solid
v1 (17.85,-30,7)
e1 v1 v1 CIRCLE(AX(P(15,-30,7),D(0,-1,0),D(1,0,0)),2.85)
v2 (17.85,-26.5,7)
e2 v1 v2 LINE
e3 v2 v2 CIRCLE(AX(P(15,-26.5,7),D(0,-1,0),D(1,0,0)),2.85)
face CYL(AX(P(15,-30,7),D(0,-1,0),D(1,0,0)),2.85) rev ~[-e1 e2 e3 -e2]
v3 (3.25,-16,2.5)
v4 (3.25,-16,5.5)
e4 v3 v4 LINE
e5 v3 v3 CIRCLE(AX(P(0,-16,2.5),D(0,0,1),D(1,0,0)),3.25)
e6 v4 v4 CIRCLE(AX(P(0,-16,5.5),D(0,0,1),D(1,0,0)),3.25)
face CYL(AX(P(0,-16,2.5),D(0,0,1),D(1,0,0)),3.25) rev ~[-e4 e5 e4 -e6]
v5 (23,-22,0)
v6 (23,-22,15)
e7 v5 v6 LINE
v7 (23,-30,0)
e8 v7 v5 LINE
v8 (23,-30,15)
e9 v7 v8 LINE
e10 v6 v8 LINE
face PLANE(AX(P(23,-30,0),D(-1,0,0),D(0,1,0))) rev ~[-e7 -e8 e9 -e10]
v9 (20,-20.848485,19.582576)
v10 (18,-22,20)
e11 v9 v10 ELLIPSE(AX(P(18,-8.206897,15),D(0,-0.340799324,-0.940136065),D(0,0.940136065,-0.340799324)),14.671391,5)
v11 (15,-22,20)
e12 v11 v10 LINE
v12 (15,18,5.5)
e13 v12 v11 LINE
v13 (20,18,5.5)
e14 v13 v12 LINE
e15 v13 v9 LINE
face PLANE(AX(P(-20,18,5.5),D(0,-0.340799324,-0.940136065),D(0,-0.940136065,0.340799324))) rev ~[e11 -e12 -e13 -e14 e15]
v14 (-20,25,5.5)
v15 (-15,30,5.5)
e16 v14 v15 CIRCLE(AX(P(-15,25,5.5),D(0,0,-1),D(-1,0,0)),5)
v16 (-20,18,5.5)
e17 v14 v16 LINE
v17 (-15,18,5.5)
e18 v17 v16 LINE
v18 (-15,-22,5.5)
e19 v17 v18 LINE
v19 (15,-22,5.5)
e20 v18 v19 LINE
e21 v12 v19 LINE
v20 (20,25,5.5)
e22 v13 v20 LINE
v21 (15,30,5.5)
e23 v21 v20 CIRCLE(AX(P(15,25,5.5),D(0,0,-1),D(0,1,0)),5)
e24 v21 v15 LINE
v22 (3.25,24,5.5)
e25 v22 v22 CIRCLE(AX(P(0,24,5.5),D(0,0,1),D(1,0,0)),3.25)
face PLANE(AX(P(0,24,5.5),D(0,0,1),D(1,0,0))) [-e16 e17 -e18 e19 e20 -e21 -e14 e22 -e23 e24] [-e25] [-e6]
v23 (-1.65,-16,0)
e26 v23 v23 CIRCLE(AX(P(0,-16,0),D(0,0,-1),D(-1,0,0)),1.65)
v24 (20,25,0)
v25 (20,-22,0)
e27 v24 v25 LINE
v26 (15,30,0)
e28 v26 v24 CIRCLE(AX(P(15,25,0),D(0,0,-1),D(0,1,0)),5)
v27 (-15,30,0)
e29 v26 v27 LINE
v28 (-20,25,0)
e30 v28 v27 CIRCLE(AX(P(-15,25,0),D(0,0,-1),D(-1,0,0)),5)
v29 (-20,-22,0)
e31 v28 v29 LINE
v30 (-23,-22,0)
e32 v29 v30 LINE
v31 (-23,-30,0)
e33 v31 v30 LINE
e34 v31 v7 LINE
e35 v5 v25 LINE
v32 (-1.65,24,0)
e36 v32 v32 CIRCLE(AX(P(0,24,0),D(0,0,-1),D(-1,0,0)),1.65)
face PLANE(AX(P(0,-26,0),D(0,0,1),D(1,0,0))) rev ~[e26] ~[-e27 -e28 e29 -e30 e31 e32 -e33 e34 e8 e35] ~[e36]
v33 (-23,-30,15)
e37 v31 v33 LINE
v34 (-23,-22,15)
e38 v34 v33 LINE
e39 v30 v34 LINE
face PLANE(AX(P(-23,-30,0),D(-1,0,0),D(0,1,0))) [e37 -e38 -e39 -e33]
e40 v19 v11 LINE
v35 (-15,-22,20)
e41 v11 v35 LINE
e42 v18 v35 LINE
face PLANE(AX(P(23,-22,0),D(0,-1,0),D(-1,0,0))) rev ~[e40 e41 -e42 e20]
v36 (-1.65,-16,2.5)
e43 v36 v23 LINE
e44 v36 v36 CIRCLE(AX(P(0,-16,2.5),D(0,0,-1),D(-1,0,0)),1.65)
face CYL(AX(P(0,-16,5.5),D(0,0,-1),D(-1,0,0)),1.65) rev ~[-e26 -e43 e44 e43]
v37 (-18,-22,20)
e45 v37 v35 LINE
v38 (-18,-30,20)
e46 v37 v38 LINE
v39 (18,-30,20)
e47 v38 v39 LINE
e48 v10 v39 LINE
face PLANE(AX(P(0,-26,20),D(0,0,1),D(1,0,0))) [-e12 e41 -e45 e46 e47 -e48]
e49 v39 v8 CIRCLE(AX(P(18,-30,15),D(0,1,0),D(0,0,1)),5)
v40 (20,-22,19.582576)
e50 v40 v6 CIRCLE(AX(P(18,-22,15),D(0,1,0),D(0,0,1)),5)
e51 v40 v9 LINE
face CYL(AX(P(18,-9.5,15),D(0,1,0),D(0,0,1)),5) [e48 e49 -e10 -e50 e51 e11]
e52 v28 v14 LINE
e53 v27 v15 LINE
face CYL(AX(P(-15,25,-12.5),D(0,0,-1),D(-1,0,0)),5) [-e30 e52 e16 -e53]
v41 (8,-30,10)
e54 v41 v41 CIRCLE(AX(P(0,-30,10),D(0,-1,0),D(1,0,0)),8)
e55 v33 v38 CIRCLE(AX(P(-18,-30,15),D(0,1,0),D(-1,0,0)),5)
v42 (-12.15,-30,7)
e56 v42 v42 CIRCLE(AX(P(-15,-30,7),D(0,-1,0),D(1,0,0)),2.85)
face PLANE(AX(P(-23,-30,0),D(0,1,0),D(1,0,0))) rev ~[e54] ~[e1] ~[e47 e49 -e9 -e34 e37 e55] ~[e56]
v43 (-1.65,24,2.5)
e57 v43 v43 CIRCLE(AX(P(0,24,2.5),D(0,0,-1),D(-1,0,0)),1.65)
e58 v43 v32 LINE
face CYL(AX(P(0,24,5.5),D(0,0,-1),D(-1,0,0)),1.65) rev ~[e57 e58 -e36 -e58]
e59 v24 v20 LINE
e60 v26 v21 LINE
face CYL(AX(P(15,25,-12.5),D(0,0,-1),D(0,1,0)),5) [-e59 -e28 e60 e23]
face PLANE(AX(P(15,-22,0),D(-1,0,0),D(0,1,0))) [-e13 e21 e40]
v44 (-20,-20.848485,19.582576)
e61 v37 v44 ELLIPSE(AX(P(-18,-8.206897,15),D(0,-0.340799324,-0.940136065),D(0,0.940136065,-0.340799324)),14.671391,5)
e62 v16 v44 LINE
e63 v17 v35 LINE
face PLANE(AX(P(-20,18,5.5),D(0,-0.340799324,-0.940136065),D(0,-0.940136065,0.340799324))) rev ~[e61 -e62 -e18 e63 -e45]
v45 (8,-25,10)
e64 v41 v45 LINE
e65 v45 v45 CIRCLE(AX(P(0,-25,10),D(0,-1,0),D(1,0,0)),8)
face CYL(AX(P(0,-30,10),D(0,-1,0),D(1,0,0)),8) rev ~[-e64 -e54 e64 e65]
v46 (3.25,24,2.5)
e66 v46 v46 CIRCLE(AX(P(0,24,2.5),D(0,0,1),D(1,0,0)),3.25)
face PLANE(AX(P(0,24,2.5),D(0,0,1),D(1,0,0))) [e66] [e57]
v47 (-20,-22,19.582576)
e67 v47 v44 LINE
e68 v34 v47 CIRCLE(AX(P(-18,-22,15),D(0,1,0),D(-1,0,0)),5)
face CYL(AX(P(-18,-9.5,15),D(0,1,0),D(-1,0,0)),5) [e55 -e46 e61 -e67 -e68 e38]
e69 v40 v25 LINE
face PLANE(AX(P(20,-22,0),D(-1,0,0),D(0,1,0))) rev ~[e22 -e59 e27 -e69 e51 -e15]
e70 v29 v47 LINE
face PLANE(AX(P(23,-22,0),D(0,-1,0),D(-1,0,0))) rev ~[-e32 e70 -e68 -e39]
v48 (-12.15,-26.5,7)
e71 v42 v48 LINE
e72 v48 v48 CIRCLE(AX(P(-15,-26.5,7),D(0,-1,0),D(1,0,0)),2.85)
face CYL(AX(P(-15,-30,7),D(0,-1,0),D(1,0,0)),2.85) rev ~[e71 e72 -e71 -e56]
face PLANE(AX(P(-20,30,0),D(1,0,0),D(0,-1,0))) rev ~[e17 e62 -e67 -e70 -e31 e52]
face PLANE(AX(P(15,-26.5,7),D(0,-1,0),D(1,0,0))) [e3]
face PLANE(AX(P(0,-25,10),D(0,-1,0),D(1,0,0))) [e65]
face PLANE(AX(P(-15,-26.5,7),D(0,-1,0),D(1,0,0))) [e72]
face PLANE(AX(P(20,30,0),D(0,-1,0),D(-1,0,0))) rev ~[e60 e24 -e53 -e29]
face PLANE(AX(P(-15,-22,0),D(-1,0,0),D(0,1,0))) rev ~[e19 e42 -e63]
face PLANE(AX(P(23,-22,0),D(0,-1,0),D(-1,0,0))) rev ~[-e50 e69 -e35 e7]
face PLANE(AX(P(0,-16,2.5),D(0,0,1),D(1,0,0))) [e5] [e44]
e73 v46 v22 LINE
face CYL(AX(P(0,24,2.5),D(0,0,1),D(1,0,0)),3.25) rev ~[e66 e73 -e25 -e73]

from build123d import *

# Parameters (mm, degrees)
F0_W           = 3
F0_H           = 8
F1_DEPTH       = 20
F0_W_2         = 30
F0_H_2         = 12
F0_H_3         = 40
F0_W_3         = 5
F2_DEPTH       = 5.5
F3_DEPTH       = 20
F5_DEPTH       = 43.001
F7_D           = 3.3
F7_DEPTH       = 13.5002857143
F7_CBORE_D     = 6.5
F7_CBORE_DEPTH = 3
F7_TIP         = 0.9914200214
F8_R           = 8
F9_DEPTH       = 5
F8_R_2         = 2.85
F10_DEPTH      = 3.5
F11_T1_DEPTH   = 30.5
F11_T3_DEPTH   = 33


# Not quite as in the source:
# - a fillet or chamfer that OpenCascade refuses, or shapes differently, is made with other operations: its cross-section is extruded or revolved along the edge and cut away or added


with BuildPart() as f1:
    # F0 (on Top) → F1 (new body)
    with BuildSketch(Plane.XY):
        Polygon((20, -30), (20, -22), (15, -22), (-15, -22), (-20, -22), (-20, -30), align=None)
        with Locations((-21.5, -26)):
            Rectangle(F0_W, F0_H)
        with Locations((21.5, -26)):
            Rectangle(F0_W, F0_H)
    extrude(amount=F1_DEPTH)

    # F0 (on Top) → F2 (join)
    with BuildSketch(Plane.XY):
        with Locations((0, 24)):
            Rectangle(F0_W_2, F0_H_2)
        with Locations((0, -2)):
            Rectangle(F0_W_2, F0_H_3)
        with Locations((-17.5, 24)):
            Rectangle(F0_W_3, F0_H_2)
        with Locations((-17.5, -2)):
            Rectangle(F0_W_3, F0_H_3)
        with Locations((17.5, 24)):
            Rectangle(F0_W_3, F0_H_2)
        with Locations((17.5, -2)):
            Rectangle(F0_W_3, F0_H_3)
    extrude(amount=F2_DEPTH)

    # F0 (on Top) → F3 (join)
    with BuildSketch(Plane.XY):
        with Locations((-17.5, -2)):
            Rectangle(F0_W_3, F0_H_3)
        with Locations((17.5, -2)):
            Rectangle(F0_W_3, F0_H_3)
    extrude(amount=F3_DEPTH)

    # F4 (on face) → F5 (cut, through all)
    with BuildSketch(Plane(origin=(-20, 0, 0), x_dir=(0, -1, 0), z_dir=(-1, 0, 0))):
        Polygon((-18, 20), (-18, 5.5), (22, 20), align=None)
    extrude(amount=-F5_DEPTH, mode=Mode.SUBTRACT)

    # F7
    with Locations(Plane.XY.offset(5.5)):
        with Locations((0, 24), (0, -16)):
            CounterBoreHole(F7_D / 2, F7_CBORE_D / 2, F7_CBORE_DEPTH, depth=F7_DEPTH)
            with Locations((0, 0, -(F7_DEPTH + F7_TIP / 2))):  # 118° drill point
                Cone(0, F7_D / 2, F7_TIP, mode=Mode.SUBTRACT)

    # F8 (on face) → F9 (cut)
    with BuildSketch(Plane.XZ.offset(30)):
        with Locations((0, 10)):
            Circle(F8_R)
    extrude(amount=-F9_DEPTH, mode=Mode.SUBTRACT)

    # F8 (on face) → F10 (cut)
    with BuildSketch(Plane.XZ.offset(30)):
        with Locations((-15, 7)):
            Circle(F8_R_2)
        with Locations((15, 7)):
            Circle(F8_R_2)
    extrude(amount=-F10_DEPTH, mode=Mode.SUBTRACT)

    # F11: fillet of radius 5 on 4 edges, made by hand

    # F11_s2 → F11_t1 (cut)
    with BuildSketch(Plane.XY.offset(-12.5)):
        with BuildLine():
            ThreePointArc((15, 30), (18.5355339059, 28.5355339059), (20, 25))
            Line((20, 25), (20, 30))
            Line((20, 30), (15, 30))
        make_face()
        with BuildLine():
            ThreePointArc((-20, 25), (-18.5355339059, 28.5355339059), (-15, 30))
            Line((-15, 30), (-20, 30))
            Line((-20, 30), (-20, 25))
        make_face()
    extrude(amount=F11_T1_DEPTH, mode=Mode.SUBTRACT)

    # F11_s4 → F11_t3 (cut)
    with BuildSketch(Plane.XZ.offset(9.5)):
        with BuildLine():
            ThreePointArc((-23, 15), (-21.5355339059, 18.5355339059), (-18, 20))
            Line((-18, 20), (-23, 20))
            Line((-23, 20), (-23, 15))
        make_face()
        with BuildLine():
            ThreePointArc((18, 20), (21.5355339059, 18.5355339059), (23, 15))
            Line((23, 15), (23, 20))
            Line((23, 20), (18, 20))
        make_face()
    extrude(amount=F11_T3_DEPTH, mode=Mode.SUBTRACT)


solid = f1.part
